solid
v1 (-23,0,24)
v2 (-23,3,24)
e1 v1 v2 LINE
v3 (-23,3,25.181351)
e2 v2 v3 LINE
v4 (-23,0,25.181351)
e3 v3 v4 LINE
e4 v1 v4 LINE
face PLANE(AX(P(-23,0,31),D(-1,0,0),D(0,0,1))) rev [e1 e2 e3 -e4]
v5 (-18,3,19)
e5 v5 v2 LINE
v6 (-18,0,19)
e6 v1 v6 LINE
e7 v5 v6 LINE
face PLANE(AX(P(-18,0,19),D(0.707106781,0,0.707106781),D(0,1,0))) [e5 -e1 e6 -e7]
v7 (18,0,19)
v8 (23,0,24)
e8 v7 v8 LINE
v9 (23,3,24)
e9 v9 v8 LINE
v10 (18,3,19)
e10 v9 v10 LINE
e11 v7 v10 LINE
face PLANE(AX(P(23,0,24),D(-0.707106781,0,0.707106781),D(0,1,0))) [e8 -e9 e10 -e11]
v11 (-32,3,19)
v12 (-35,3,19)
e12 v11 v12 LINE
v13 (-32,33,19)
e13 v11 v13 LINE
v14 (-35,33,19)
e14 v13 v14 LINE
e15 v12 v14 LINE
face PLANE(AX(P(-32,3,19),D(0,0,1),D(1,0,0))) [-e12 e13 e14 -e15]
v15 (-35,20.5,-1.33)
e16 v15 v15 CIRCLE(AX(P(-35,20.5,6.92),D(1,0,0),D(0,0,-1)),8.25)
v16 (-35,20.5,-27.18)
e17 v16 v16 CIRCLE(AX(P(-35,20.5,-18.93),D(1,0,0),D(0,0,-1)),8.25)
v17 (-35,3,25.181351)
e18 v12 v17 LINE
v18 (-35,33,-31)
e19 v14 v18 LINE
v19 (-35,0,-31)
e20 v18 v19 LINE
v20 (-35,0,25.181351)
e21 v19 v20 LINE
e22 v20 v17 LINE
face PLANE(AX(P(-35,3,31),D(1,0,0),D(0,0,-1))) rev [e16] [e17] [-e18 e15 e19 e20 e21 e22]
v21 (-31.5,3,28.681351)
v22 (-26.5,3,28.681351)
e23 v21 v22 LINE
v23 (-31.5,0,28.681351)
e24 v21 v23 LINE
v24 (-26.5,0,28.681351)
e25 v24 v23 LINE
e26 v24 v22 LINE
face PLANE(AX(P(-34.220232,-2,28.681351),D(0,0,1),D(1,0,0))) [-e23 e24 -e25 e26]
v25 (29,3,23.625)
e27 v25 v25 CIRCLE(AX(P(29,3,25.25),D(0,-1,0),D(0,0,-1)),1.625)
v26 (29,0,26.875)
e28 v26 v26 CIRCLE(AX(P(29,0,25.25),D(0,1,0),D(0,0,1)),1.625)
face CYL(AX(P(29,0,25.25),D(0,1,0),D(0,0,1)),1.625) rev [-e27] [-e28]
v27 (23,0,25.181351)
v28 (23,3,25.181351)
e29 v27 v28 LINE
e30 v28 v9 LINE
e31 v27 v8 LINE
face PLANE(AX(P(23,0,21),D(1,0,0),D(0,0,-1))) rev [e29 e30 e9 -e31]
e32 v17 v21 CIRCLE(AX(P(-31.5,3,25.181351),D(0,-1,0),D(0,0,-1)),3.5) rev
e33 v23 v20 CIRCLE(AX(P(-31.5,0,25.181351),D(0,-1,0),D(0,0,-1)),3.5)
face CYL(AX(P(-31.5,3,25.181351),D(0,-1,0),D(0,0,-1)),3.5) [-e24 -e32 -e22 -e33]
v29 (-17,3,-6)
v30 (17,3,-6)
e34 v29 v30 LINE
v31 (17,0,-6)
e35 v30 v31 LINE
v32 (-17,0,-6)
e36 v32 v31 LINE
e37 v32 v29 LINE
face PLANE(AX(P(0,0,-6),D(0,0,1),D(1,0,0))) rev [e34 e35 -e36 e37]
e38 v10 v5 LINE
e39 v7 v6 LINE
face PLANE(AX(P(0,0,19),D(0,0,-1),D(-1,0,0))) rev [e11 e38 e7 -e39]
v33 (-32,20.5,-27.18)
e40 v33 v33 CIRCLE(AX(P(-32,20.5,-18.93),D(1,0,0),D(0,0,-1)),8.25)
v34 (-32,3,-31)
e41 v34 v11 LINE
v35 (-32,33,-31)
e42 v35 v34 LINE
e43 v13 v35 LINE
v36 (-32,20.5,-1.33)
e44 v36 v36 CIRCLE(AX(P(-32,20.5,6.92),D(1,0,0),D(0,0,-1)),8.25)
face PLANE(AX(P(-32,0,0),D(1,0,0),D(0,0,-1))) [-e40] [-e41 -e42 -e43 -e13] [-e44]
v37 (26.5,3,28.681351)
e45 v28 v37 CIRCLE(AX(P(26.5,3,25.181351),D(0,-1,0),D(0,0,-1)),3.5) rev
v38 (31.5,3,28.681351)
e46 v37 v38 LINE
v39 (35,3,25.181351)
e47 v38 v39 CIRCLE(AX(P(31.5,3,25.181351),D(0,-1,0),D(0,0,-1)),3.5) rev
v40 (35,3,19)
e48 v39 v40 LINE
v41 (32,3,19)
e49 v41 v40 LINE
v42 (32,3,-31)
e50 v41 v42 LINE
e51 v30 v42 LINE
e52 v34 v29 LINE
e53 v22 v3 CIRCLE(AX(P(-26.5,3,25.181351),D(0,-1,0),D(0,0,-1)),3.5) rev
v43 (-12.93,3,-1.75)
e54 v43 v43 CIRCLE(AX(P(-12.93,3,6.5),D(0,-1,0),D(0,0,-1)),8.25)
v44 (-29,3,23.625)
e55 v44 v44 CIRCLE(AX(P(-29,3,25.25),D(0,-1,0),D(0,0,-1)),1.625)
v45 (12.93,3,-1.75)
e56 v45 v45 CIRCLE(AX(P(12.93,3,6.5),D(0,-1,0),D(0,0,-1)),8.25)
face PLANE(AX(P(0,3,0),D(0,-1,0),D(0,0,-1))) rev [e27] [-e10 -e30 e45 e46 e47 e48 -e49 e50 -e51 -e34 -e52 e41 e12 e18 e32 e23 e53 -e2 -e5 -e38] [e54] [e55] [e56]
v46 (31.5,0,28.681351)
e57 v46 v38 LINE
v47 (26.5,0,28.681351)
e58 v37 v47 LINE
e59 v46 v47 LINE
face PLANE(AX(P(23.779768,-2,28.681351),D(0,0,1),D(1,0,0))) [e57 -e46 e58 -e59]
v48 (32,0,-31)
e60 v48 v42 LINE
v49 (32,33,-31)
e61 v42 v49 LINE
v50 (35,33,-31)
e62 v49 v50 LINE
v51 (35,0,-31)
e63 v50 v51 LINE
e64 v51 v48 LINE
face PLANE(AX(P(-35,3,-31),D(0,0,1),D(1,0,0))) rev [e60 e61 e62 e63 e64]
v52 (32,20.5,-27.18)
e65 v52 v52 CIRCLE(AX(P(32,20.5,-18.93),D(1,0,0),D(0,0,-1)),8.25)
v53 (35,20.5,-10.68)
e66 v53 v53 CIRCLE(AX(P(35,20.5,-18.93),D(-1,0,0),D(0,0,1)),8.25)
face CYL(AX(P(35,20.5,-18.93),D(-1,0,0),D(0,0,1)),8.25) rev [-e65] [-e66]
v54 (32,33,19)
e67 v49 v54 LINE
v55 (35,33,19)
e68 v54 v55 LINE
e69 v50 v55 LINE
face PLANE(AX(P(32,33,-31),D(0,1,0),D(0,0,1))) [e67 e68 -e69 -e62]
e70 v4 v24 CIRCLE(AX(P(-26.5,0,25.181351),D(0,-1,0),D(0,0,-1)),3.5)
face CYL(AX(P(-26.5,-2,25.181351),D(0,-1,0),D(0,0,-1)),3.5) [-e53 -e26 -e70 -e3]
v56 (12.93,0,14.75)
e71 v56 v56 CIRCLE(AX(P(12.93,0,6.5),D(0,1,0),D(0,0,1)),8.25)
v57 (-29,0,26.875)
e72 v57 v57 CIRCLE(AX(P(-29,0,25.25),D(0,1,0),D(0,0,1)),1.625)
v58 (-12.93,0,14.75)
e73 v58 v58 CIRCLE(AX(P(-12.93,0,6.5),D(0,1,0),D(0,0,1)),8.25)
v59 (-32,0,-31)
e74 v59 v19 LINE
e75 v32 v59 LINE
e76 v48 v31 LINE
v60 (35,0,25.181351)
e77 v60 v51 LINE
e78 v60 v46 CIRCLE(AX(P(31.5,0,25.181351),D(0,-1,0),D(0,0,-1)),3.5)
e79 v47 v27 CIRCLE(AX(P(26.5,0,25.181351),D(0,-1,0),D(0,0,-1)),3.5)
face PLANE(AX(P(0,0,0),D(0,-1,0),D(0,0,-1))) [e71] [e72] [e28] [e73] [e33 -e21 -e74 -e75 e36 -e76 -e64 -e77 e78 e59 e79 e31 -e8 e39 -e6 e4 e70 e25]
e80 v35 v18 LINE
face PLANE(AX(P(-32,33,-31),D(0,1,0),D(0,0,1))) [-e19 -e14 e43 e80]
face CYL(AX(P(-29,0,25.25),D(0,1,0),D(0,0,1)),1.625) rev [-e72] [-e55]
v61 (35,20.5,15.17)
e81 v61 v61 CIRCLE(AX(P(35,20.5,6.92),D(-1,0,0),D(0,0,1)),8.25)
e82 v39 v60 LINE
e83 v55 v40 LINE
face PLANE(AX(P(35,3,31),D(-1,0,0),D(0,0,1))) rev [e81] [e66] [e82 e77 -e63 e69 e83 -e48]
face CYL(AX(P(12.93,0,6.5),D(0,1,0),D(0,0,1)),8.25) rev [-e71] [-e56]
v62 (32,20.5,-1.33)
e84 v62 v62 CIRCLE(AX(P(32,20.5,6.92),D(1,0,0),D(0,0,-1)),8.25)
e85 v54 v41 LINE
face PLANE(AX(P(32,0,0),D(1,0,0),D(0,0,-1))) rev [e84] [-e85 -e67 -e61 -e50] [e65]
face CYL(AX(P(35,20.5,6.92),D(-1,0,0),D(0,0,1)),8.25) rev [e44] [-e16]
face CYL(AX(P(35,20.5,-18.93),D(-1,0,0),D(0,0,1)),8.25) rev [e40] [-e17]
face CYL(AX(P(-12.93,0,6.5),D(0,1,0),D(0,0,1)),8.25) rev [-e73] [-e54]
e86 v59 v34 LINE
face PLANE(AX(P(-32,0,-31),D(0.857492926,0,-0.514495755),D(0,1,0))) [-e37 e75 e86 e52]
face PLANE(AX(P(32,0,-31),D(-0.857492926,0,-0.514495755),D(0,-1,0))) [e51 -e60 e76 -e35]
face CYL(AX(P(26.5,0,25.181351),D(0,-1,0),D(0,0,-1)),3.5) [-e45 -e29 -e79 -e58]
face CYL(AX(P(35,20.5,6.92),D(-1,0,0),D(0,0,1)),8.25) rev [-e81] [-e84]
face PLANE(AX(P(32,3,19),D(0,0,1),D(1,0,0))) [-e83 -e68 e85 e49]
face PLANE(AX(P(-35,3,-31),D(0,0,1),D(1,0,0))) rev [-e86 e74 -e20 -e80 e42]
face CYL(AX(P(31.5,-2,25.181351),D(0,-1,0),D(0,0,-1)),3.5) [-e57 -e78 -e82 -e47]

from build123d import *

# Parameters (mm, degrees)
CROQUIS1_W                 = 70
CROQUIS1_H                 = 62
SALIENTE_EXTRUIR1_DEPTH    = 3
CORTAR_EXTRUIR1_DEPTH      = 47.8508271
CORTAR_EXTRUIR2_DEPTH      = 47.8508271
CROQUIS4_W                 = 46
CROQUIS4_H                 = 10
CORTAR_EXTRUIR3_DEPTH      = 47.8508271
CROQUIS5_W                 = 46
CROQUIS5_H                 = 2
CORTAR_EXTRUIR4_DEPTH      = 47.8508271
CORTAR_EXTRUIR5_DEPTH      = 47.8508271
CORTAR_EXTRUIR5_DEPTH_BACK = 47.8508271
CROQUIS6_R                 = 1.625
CHAFL_N1_START             = -4
CHAFL_N1_OUTLINE_W         = 7.071067812
CHAFL_N1_OUTLINE_H         = 3
CHAFL_N1_DEPTH             = 4.707106781
CHAFL_N2_START             = -0.707106781
CHAFL_N2_OUTLINE_W         = 7.071067812
CHAFL_N2_OUTLINE_H         = 3
CHAFL_N2_DEPTH             = 4.707106781
CORTAR_EXTRUIR6_DEPTH      = 47.8508271
CORTAR_EXTRUIR6_DEPTH_BACK = 47.8508271
CROQUIS7_R                 = 8.25
SALIENTE_EXTRUIR2_DEPTH    = 3
CORTAR_EXTRUIR7_DEPTH      = 69.23672032
CORTAR_EXTRUIR7_DEPTH_BACK = 69.23672032
CORTAR_EXTRUIR8_DEPTH      = 47.8508271
CHAFL_N3_DEPTH             = 3
CHAFL_N5_DEPTH             = 3
CROQUIS13_W                = 50
CROQUIS13_H                = 30
SALIENTE_EXTRUIR3_DEPTH    = 3
CROQUIS14_W                = 50
CROQUIS14_H                = 30
SALIENTE_EXTRUIR4_DEPTH    = 3
REDONDEO1_R                = 5
CORTAR_EXTRUIR9_DEPTH      = 84.366660003
CORTAR_EXTRUIR9_DEPTH_BACK = 84.366660003
CROQUIS16_R                = 8.25
CROQUIS17_W                = 10.440463992
CROQUIS17_H                = 4.63729848
CORTAR_EXTRUIR10_DEPTH     = 5
CROQUIS18_W                = 0.779768004
CROQUIS18_H                = 2.68135076
SALIENTE_EXTRUIR5_DEPTH    = 3
CROQUIS19_W                = 0.779768004
CROQUIS19_H                = 2.68135076
SALIENTE_EXTRUIR6_DEPTH    = 3
REDONDEO6_R                = 3.5
REDONDEO7_R                = 3.5


with BuildPart() as part:
    # Croquis1 → Saliente-Extruir1 (new body)
    with BuildSketch(Plane(origin=(0, 0, 0), x_dir=(1, 0, 0), z_dir=(0, 1, 0))):
        Rectangle(CROQUIS1_W, CROQUIS1_H)
    extrude(amount=SALIENTE_EXTRUIR1_DEPTH)

    # Croquis2 → Cortar-Extruir1 (cut, through all)
    with BuildSketch(Plane(origin=(0, 3, 0), x_dir=(1, 0, 0), z_dir=(0, 1, 0))):
        Polygon((31.754264805, 31), (15.877132403, 58.5), (-15.877132403, 58.5), (-31.754264805, 31), (-15.877132403, 3.5), (15.877132403, 3.5), align=None)
    extrude(amount=-CORTAR_EXTRUIR1_DEPTH, mode=Mode.SUBTRACT)

    # Croquis3 → Cortar-Extruir2 (cut, through all)
    with BuildSketch(Plane(origin=(0, 3, 0), x_dir=(1, 0, 0), z_dir=(0, 1, 0))):
        with BuildLine():
            Line((-13, -21), (13, -21))
            ThreePointArc((13, -21), (23, -31), (13, -41))
            Line((13, -41), (-13, -41))
            ThreePointArc((-13, -41), (-23, -31), (-13, -21))
        make_face()
    extrude(amount=-CORTAR_EXTRUIR2_DEPTH, mode=Mode.SUBTRACT)

    # Croquis4 → Cortar-Extruir3 (cut, through all)
    with BuildSketch(Plane(origin=(0, 3, 0), x_dir=(1, 0, 0), z_dir=(0, 1, 0))):
        with Locations((0, -26)):
            Rectangle(CROQUIS4_W, CROQUIS4_H)
    extrude(amount=-CORTAR_EXTRUIR3_DEPTH, mode=Mode.SUBTRACT)

    # Croquis5 → Cortar-Extruir4 (cut, through all)
    with BuildSketch(Plane(origin=(0, 3, 0), x_dir=(1, 0, 0), z_dir=(0, 1, 0))):
        with Locations((0, -20)):
            Rectangle(CROQUIS5_W, CROQUIS5_H)
    extrude(amount=-CORTAR_EXTRUIR4_DEPTH, mode=Mode.SUBTRACT)

    # Croquis6 → Cortar-Extruir5 (cut, two sides: drawn at the far end of the back side and taken through both)
    with BuildSketch(Plane(origin=(0, 3, 0), x_dir=(1, 0, 0), z_dir=(0, 1, 0)).offset(-CORTAR_EXTRUIR5_DEPTH_BACK)):
        with Locations(Location((-29, -25.25, 0), (0, 0, 270))):
            Circle(CROQUIS6_R)
        with Locations(Location((29, -25.25, 0), (0, 0, 270))):
            Circle(CROQUIS6_R)
    extrude(amount=CORTAR_EXTRUIR5_DEPTH + CORTAR_EXTRUIR5_DEPTH_BACK, mode=Mode.SUBTRACT)

    # Chaflán1: read off the stored shape, not the designer's step
    # Chaflán1 outline → Chaflán1 (add)
    with BuildSketch(Plane(origin=(0, 0, 0), x_dir=(0.7071067811865471, 0, -0.707106781186548), z_dir=(0.707106781186548, 0, 0.707106781186547)).offset(CHAFL_N1_START)):
        with Locations((-29.69848481, 1.5)):
            Rectangle(CHAFL_N1_OUTLINE_W, CHAFL_N1_OUTLINE_H)
    extrude(amount=CHAFL_N1_DEPTH)

    # Chaflán2: read off the stored shape, not the designer's step
    # Chaflán2 outline → Chaflán2 (add)
    with BuildSketch(Plane(origin=(0, 0, 0), x_dir=(0.707106781186548, 0, 0.707106781186547), z_dir=(0.707106781186547, 0, -0.707106781186548)).offset(CHAFL_N2_START)):
        with Locations((29.69848481, -1.5)):
            Rectangle(CHAFL_N2_OUTLINE_W, CHAFL_N2_OUTLINE_H)
    extrude(amount=CHAFL_N2_DEPTH)

    # Croquis7 → Cortar-Extruir6 (cut, two sides: drawn at the far end of the back side and taken through both)
    with BuildSketch(Plane(origin=(0, 3, 0), x_dir=(1, 0, 0), z_dir=(0, 1, 0)).offset(-CORTAR_EXTRUIR6_DEPTH_BACK)):
        with Locations(Location((-12.93, -6.5, 0), (0, 0, 270))):
            Circle(CROQUIS7_R)
        with Locations(Location((12.93, -6.5, 0), (0, 0, 270))):
            Circle(CROQUIS7_R)
    extrude(amount=CORTAR_EXTRUIR6_DEPTH + CORTAR_EXTRUIR6_DEPTH_BACK, mode=Mode.SUBTRACT)

    # Croquis8 → Saliente-Extruir2 (add)
    with BuildSketch(Plane(origin=(0, 3, 0), x_dir=(1, 0, 0), z_dir=(0, 1, 0))):
        Polygon((15.877132403, 3.5), (31.754264805, 31), (15.877132403, 58.5), (-15.877132403, 58.5), (-31.754264805, 31), (-15.877132403, 3.5), (0, 3.5), align=None)
    extrude(amount=-SALIENTE_EXTRUIR2_DEPTH)

    # Croquis9 → Cortar-Extruir7 (cut, two sides: drawn at the far end of the back side and taken through both)
    with BuildSketch(Plane(origin=(0, 3, 0), x_dir=(1, 0, 0), z_dir=(0, 1, 0)).offset(-CORTAR_EXTRUIR7_DEPTH_BACK)):
        Polygon((-232.018715641, 31), (-35, 31), (35, 31), (232.018715641, 31), (232.018715641, 425.037431282), (-232.018715641, 425.037431282), align=None)
    extrude(amount=CORTAR_EXTRUIR7_DEPTH + CORTAR_EXTRUIR7_DEPTH_BACK, mode=Mode.SUBTRACT)

    # Croquis10 → Cortar-Extruir8 (cut, through all)
    with BuildSketch(Plane(origin=(0, 3, 0), x_dir=(1, 0, 0), z_dir=(0, 1, 0))):
        Polygon((0, 6), (-32, 6), (-32, 31), (32, 31), (32, 6), align=None)
    extrude(amount=-CORTAR_EXTRUIR8_DEPTH, mode=Mode.SUBTRACT)

    # Chaflán3: read off the stored shape, not the designer's step
    # Chaflán3 outline → Chaflán3 (add)
    with BuildSketch(Plane(origin=(0, 0, 0), x_dir=(1, 0, 0), z_dir=(0, 1, 0))):
        Polygon((-32, 6), (-17, 6), (-32, 31), align=None)
    extrude(amount=CHAFL_N3_DEPTH)

    # Chaflán5: read off the stored shape, not the designer's step
    # Chaflán5 outline → Chaflán5 (add)
    with BuildSketch(Plane(origin=(0, 0, 0), x_dir=(1, 0, 0), z_dir=(0, 1, 0))):
        Polygon((32, 6), (32, 31), (17, 6), align=None)
    extrude(amount=CHAFL_N5_DEPTH)

    # Croquis13 → Saliente-Extruir3 (add)
    with BuildSketch(Plane.ZY.offset(35)):
        with Locations((-6, 18)):
            Rectangle(CROQUIS13_W, CROQUIS13_H)
    extrude(amount=-SALIENTE_EXTRUIR3_DEPTH)

    # Croquis14 → Saliente-Extruir4 (add)
    with BuildSketch(Plane(origin=(35, 0, 0), x_dir=(0, 0, -1), z_dir=(1, 0, 0))):
        with Locations((6, 18)):
            Rectangle(CROQUIS14_W, CROQUIS14_H)
    extrude(amount=-SALIENTE_EXTRUIR4_DEPTH)

    # Redondeo1
    redondeo1_edges = [part.edges().sort_by_distance(p)[0] for p in [
        (-23, 1.5, 31),
        (23, 1.5, 31),
        (35, 1.5, 31),
        (-35, 1.5, 31),
    ]]
    fillet(redondeo1_edges, radius=REDONDEO1_R)

    # Croquis16 → Cortar-Extruir9 (cut, two sides: drawn at the far end of the back side and taken through both)
    with BuildSketch(Plane.ZY.offset(35).offset(-CORTAR_EXTRUIR9_DEPTH_BACK)):
        with Locations((-18.93, 20.5)):
            Circle(CROQUIS16_R)
        with Locations((6.92, 20.5)):
            Circle(CROQUIS16_R)
    extrude(amount=CORTAR_EXTRUIR9_DEPTH + CORTAR_EXTRUIR9_DEPTH_BACK, mode=Mode.SUBTRACT)

    # Croquis17 → Cortar-Extruir10 (cut)
    with BuildSketch(Plane(origin=(0, 3, 0), x_dir=(1, 0, 0), z_dir=(0, 1, 0))):
        with Locations((-29, -31)):
            Rectangle(CROQUIS17_W, CROQUIS17_H)
        with Locations((29, -31)):
            Rectangle(CROQUIS17_W, CROQUIS17_H)
    extrude(amount=-CORTAR_EXTRUIR10_DEPTH, mode=Mode.SUBTRACT)

    # Croquis18 → Saliente-Extruir5 (add)
    with BuildSketch(Plane(origin=(0, 3, 0), x_dir=(1, 0, 0), z_dir=(0, 1, 0))):
        with Locations((-34.610115998, -27.34067538)):
            Rectangle(CROQUIS18_W, CROQUIS18_H)
        with Locations((-23.389884002, -27.34067538)):
            Rectangle(CROQUIS18_W, CROQUIS18_H)
    extrude(amount=-SALIENTE_EXTRUIR5_DEPTH)

    # Croquis19 → Saliente-Extruir6 (add)
    with BuildSketch(Plane(origin=(0, 3, 0), x_dir=(1, 0, 0), z_dir=(0, 1, 0))):
        with Locations((23.389884002, -27.34067538)):
            Rectangle(CROQUIS19_W, CROQUIS19_H)
        with Locations((34.610115998, -27.34067538)):
            Rectangle(CROQUIS19_W, CROQUIS19_H)
    extrude(amount=-SALIENTE_EXTRUIR6_DEPTH)

    # Redondeo6
    redondeo6_edges = [part.edges().sort_by_distance(p)[0] for p in [
        (-35, 1.5, 28.68135076),
    ]]
    fillet(redondeo6_edges, radius=REDONDEO6_R)

    # Redondeo7
    redondeo7_edges = [part.edges().sort_by_distance(p)[0] for p in [
        (-23, 1.5, 28.68135076),
        (23, 1.5, 28.68135076),
        (35, 1.5, 28.68135076),
    ]]
    fillet(redondeo7_edges, radius=REDONDEO7_R)


solid = part.part
